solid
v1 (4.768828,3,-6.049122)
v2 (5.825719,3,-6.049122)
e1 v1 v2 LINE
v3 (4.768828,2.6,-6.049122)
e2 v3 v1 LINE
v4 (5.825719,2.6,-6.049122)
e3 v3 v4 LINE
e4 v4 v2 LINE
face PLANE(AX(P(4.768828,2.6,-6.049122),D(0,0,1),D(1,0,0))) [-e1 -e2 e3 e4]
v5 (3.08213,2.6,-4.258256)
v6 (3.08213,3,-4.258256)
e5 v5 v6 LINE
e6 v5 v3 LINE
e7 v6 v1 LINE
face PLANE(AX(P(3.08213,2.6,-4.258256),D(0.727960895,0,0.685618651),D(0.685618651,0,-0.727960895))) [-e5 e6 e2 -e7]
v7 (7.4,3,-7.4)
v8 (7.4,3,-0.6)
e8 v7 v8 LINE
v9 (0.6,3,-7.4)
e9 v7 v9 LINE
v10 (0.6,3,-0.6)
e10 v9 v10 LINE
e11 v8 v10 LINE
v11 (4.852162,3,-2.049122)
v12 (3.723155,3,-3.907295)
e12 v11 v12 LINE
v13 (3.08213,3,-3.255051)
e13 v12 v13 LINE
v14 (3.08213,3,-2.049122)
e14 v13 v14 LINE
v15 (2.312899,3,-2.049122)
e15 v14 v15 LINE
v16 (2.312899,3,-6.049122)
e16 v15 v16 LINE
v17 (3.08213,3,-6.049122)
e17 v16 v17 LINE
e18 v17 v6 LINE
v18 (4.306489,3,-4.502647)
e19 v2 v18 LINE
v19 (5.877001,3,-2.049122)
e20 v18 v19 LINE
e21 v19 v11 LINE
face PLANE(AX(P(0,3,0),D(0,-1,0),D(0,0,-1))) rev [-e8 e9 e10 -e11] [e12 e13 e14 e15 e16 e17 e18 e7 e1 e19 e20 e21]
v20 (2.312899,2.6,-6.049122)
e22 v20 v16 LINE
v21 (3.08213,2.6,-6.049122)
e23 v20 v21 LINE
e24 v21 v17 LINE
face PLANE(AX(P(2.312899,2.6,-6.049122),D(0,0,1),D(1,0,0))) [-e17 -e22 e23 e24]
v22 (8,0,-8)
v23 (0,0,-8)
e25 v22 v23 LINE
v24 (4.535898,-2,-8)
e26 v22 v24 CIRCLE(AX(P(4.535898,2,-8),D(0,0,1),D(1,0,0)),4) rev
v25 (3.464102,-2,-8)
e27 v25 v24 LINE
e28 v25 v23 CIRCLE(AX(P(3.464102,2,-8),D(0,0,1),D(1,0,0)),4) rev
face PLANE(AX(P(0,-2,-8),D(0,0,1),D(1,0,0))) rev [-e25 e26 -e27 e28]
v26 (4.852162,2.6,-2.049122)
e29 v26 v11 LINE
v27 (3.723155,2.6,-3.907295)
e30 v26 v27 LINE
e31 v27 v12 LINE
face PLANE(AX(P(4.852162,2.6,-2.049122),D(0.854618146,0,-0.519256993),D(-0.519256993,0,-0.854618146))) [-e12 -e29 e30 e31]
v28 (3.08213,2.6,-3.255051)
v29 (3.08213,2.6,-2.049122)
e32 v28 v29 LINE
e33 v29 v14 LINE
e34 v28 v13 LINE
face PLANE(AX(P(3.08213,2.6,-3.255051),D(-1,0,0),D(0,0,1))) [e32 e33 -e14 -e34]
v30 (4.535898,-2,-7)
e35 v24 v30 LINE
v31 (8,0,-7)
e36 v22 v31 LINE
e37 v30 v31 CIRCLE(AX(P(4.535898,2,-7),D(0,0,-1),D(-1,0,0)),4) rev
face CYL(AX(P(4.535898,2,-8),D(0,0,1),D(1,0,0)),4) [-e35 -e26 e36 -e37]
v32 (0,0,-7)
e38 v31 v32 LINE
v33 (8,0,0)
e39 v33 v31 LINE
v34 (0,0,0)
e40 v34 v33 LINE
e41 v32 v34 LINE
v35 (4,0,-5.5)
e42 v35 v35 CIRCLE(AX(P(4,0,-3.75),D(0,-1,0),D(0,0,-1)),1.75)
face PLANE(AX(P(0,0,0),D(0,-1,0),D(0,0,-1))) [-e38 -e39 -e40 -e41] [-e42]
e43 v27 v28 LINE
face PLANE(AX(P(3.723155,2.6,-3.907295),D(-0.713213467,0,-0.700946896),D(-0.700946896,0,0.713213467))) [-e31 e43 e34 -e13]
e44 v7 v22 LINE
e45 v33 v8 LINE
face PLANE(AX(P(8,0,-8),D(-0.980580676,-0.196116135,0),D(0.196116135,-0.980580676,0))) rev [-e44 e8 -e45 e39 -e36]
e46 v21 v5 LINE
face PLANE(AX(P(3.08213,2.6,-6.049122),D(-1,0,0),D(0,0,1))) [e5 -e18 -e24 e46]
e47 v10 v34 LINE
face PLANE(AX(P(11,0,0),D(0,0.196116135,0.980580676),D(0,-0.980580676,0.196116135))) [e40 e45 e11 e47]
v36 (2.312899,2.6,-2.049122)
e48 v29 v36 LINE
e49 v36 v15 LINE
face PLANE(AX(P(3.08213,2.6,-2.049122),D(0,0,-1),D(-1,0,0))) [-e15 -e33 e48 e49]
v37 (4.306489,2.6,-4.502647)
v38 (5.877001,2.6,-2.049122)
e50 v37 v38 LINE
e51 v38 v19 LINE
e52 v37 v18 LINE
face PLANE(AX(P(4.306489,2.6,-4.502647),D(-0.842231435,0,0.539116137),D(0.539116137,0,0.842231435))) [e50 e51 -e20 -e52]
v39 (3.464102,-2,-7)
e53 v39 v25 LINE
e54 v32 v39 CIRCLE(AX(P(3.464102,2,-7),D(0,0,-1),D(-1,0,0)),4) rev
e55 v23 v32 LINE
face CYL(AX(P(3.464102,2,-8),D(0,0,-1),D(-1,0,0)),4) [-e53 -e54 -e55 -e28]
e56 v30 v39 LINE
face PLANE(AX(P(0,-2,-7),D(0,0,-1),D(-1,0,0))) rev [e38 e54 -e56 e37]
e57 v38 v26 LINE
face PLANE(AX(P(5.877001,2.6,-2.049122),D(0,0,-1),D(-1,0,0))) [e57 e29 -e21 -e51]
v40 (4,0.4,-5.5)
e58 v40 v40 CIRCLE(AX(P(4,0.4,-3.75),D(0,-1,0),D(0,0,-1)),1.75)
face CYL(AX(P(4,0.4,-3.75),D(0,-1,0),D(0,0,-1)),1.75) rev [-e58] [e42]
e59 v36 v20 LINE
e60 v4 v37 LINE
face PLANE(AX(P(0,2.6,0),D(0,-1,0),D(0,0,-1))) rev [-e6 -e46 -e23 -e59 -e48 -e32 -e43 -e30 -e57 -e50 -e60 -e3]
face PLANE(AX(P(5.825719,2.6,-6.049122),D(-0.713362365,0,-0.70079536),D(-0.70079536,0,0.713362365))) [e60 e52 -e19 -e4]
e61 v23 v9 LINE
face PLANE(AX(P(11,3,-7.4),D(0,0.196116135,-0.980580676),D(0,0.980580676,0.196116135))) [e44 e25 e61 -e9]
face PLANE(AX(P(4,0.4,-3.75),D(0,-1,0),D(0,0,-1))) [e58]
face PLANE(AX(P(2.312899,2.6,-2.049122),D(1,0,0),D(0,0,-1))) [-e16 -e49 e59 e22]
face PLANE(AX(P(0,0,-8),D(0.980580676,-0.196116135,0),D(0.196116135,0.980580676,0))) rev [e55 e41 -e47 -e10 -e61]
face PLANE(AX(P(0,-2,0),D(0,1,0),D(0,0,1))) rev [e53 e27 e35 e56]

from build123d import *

# Parameters (mm, degrees)
SKETCH1_W               = 8
SKETCH1_H               = 8
BOSS_EXTRUDE1_DEPTH     = 3
CUT_EXTRUDE1_DEPTH      = 12.704699911
CUT_EXTRUDE1_DEPTH_BACK = 12.704699911
CUT_EXTRUDE2_DEPTH      = 11
SKETCH4_R               = 1.75
CUT_EXTRUDE3_DEPTH      = 0.4
SKETCH5_W               = 8
SKETCH5_H               = 1
BOSS_EXTRUDE2_DEPTH     = 2
FILLET1_R               = 4
CUT_EXTRUDE4_DEPTH      = 0.4


with BuildPart() as part:
    # Sketch1 → Boss-Extrude1 (new body)
    with BuildSketch(Plane(origin=(0, 0, 0), x_dir=(1, 0, 0), z_dir=(0, 1, 0))):
        with Locations((4, 4)):
            Rectangle(SKETCH1_W, SKETCH1_H)
    extrude(amount=BOSS_EXTRUDE1_DEPTH)

    # Sketch2 → Cut-Extrude1 (cut, two sides: drawn at the far end of the back side and taken through both)
    with BuildSketch(Plane.XY.offset(-CUT_EXTRUDE1_DEPTH_BACK)):
        Polygon((0, 0), (0.6, 3), (0, 3), align=None)
        Polygon((8, 0), (7.4, 3), (8, 3), align=None)
    extrude(amount=CUT_EXTRUDE1_DEPTH + CUT_EXTRUDE1_DEPTH_BACK, mode=Mode.SUBTRACT)

    # Sketch3 → Cut-Extrude2 (cut)
    with BuildSketch(Plane(origin=(0, 0, 0), x_dir=(0, 0, -1), z_dir=(1, 0, 0))):
        Polygon((0, 0), (0.6, 3), (0, 3), align=None)
        Polygon((8, 3), (7.4, 3), (8, 0), align=None)
    extrude(amount=CUT_EXTRUDE2_DEPTH, mode=Mode.SUBTRACT)

    # Sketch4 → Cut-Extrude3 (cut)
    with BuildSketch(Plane.XZ):
        with Locations(Location((4, -3.75, 0), (0, 0, 270))):
            Circle(SKETCH4_R)
    extrude(amount=-CUT_EXTRUDE3_DEPTH, mode=Mode.SUBTRACT)

    # Sketch5 → Boss-Extrude2 (add)
    with BuildSketch(Plane.XZ):
        with Locations((4, -7.5)):
            Rectangle(SKETCH5_W, SKETCH5_H)
    extrude(amount=BOSS_EXTRUDE2_DEPTH)

    # Fillet1
    # the kernel refuses this fillet: 4 mm, written as the material it takes off along each edge
    with BuildSketch(Plane(origin=(8, -2, -16.660254038), x_dir=(0, 1, 0), z_dir=(0, 0, 1)), Plane(origin=(0, -2, 1.660254038), x_dir=(0, 1, 0), z_dir=(0, 0, -1))) as fillet1_piece_1:
        with BuildLine():
            CenterArc((4, 3.464101615), FILLET1_R, 180, 60)
            Line((0, 3.464101615), (-0.08, 3.464101615))
            Line((-0.08, 3.464101615), (-0.08, 0))
            Line((-0.08, 0), (0, -0.08))
            ThreePointArc((0, -0.08), (1, -0.08), (1.96, -0.069282032))
            Line((1.96, -0.069282032), (2, 0))
        make_face()
    extrude(amount=18.320508076, mode=Mode.SUBTRACT)

    # Sketch6 → Cut-Extrude4 (cut)
    with BuildSketch(Plane(origin=(0, 3, 0), x_dir=(1, 0, 0), z_dir=(0, 1, 0))):
        Polygon((2.312898911, 2.049121591), (2.312898911, 6.049121591), (3.08212968, 6.049121591), (3.08212968, 4.258256206), (4.768828398, 6.049121591), (5.825719424, 6.049121591), (4.306488654, 4.502647232), (5.877001475, 2.049121591), (4.852161731, 2.049121591), (3.723155321, 3.907294667), (3.08212968, 3.255051078), (3.08212968, 2.049121591), align=None)
    extrude(amount=-CUT_EXTRUDE4_DEPTH, mode=Mode.SUBTRACT)


solid = part.part
